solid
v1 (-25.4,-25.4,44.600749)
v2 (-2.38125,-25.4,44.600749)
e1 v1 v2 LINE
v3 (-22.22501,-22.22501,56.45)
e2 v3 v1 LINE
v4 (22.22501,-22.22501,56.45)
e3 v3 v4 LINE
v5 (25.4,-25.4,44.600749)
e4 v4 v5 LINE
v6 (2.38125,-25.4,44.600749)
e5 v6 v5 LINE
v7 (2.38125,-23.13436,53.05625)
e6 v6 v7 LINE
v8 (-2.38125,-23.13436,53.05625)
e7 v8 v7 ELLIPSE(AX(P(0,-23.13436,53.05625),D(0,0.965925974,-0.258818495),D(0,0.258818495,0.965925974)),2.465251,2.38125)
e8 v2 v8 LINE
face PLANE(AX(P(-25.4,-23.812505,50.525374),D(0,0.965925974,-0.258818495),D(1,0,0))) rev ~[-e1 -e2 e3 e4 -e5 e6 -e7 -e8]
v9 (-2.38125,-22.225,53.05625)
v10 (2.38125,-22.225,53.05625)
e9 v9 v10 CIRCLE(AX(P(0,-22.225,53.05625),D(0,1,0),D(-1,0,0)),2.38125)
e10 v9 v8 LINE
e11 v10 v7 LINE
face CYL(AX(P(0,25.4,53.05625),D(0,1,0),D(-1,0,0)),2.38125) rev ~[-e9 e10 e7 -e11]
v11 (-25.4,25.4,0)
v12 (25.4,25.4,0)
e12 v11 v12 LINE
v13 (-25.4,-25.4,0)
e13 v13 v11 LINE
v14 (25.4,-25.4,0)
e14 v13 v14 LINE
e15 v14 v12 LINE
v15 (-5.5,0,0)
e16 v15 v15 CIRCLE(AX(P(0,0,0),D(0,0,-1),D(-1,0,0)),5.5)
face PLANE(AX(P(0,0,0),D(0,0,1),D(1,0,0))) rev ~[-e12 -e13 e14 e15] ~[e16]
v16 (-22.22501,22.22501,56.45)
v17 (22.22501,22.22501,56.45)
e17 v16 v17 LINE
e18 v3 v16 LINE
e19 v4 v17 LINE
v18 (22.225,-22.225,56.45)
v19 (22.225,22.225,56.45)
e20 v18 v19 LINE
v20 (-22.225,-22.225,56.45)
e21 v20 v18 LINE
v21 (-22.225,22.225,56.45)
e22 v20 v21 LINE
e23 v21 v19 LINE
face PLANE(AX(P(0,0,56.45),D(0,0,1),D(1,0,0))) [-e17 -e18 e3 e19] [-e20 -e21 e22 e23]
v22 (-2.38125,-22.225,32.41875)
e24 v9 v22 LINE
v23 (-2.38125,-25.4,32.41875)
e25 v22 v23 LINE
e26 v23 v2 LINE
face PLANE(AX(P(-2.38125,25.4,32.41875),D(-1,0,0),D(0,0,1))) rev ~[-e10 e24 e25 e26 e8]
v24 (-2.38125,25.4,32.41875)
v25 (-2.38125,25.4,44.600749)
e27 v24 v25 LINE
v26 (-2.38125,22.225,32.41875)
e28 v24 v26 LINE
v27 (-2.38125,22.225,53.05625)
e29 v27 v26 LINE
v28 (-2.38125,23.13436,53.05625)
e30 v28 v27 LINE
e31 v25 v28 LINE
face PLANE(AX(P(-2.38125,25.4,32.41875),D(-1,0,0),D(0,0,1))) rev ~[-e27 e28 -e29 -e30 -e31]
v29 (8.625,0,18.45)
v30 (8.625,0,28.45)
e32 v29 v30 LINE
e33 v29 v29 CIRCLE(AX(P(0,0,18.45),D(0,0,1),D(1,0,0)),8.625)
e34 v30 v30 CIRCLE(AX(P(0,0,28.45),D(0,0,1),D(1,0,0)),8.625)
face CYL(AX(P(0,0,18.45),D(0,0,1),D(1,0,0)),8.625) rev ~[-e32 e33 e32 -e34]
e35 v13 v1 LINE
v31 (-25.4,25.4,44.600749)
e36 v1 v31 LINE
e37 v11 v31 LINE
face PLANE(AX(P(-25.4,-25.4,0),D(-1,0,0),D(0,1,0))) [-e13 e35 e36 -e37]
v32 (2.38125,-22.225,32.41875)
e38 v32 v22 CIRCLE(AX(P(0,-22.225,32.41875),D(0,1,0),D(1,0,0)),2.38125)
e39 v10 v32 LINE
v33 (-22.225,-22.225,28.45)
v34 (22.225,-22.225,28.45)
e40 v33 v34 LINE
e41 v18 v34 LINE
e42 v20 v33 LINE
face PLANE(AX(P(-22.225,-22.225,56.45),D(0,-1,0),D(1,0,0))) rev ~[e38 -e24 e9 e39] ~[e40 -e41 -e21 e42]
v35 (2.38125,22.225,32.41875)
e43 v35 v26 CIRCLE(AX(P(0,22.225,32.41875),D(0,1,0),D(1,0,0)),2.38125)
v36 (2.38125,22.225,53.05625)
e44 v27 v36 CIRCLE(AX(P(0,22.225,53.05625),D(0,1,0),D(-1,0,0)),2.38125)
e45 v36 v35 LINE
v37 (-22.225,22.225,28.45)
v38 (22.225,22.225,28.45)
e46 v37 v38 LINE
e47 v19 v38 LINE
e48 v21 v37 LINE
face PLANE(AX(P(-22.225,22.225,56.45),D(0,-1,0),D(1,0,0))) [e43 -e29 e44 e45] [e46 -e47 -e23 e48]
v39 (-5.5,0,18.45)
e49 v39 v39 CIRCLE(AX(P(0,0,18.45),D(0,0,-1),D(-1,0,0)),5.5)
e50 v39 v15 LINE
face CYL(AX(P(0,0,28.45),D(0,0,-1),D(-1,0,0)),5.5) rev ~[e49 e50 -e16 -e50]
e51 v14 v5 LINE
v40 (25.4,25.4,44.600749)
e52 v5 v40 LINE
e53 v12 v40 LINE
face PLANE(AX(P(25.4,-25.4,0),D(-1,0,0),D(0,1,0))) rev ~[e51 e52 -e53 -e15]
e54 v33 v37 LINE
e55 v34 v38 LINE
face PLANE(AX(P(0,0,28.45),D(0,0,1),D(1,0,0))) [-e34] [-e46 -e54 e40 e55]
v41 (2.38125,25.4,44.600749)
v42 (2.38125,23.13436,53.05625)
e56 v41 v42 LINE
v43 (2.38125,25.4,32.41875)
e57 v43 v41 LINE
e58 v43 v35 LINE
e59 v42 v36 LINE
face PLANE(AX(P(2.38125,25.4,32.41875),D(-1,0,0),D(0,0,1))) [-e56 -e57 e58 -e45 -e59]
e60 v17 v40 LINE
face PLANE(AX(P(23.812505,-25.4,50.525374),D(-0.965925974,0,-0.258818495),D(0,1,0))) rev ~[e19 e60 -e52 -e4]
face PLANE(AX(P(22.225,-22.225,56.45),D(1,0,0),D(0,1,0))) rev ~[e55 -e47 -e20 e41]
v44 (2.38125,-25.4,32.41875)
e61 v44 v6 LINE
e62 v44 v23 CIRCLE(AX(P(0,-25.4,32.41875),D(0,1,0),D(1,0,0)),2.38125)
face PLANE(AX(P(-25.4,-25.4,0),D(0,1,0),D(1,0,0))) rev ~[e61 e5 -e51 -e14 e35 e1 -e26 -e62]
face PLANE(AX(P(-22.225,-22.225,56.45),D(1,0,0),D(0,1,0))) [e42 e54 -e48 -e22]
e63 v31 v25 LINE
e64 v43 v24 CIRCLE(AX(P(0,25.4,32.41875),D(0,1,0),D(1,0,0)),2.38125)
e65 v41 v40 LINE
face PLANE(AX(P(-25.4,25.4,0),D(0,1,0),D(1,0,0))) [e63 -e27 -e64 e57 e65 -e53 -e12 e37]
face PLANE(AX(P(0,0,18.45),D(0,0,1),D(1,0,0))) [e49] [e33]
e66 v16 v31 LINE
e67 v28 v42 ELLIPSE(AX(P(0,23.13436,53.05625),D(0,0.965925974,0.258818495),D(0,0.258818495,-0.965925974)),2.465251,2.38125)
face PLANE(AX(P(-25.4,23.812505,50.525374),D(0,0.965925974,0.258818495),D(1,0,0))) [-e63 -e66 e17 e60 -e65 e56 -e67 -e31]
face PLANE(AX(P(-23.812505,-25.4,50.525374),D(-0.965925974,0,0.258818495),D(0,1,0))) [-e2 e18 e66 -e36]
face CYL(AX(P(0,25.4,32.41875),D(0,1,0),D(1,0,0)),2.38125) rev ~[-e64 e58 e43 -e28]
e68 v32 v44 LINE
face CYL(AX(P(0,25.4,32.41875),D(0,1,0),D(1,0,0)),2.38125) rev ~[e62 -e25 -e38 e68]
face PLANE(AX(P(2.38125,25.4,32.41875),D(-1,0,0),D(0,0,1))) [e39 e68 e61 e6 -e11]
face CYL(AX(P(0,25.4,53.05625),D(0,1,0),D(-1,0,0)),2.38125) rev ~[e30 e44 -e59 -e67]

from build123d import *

# Parameters (mm, degrees)
F0_W           = 50.8
F0_H           = 50.8
F1_DEPTH       = 56.45
F2_W           = 44.45
F2_H           = 44.45
F3_DEPTH       = 28
F5_D           = 11
F5_CBORE_D     = 17.25
F5_CBORE_DEPTH = 10
F6_SIZE2       = 11.849251
F6_SIZE        = 3.17499
F8_W           = 4.7625
F8_H           = 20.6375
F9_DEPTH       = 50.801


# Not quite as in the source:
# - a fillet or chamfer is up to 0.001 mm smaller than in the source, because OpenCascade refuses the exact size


with BuildPart() as f1:
    # F0 (on Top) → F1 (new body)
    with BuildSketch(Plane.XY):
        Rectangle(F0_W, F0_H)
    extrude(amount=F1_DEPTH)

    # F2 (on face) → F3 (cut)
    with BuildSketch(Plane.XY.offset(56.45)):
        Rectangle(F2_W, F2_H)
    extrude(amount=-F3_DEPTH, mode=Mode.SUBTRACT)

    # F5 (through all)
    with Locations(Plane.XY.offset(28.45)):
        with Locations((0, 0)):
            CounterBoreHole(F5_D / 2, F5_CBORE_D / 2, F5_CBORE_DEPTH)

    # F6 (size 3.175 and 11.849261314 in the source; OpenCascade refuses exactly that, so slightly less here)
    f6_edges = [f1.edges().sort_by_distance(p)[0] for p in [
        (0, 25.4, 56.45),
        (25.4, 0, 56.45),
        (0, -25.4, 56.45),
        (-25.4, 0, 56.45),
    ]]
    f6_side = f1.faces().sort_by_distance((0, -24.68158, 56.45))[0]
    chamfer(f6_edges, length=F6_SIZE, length2=F6_SIZE2, reference=f6_side)

    # F8 (on offset) → F9 (cut, through all)
    with BuildSketch(Plane(origin=(0, 25.4, 0), x_dir=(-1, 0, 0), z_dir=(0, 1, 0))):
        with BuildLine():
            ThreePointArc((-2.38125, 32.41875), (0, 30.0375), (2.38125, 32.41875))
            Line((2.38125, 32.41875), (-2.38125, 32.41875))
        make_face()
        with Locations((0, 42.7375)):
            Rectangle(F8_W, F8_H)
        with BuildLine():
            Line((-2.38125, 53.05625), (2.38125, 53.05625))
            ThreePointArc((2.38125, 53.05625), (0, 55.4375), (-2.38125, 53.05625))
        make_face()
    extrude(amount=-F9_DEPTH, mode=Mode.SUBTRACT)


solid = f1.part
